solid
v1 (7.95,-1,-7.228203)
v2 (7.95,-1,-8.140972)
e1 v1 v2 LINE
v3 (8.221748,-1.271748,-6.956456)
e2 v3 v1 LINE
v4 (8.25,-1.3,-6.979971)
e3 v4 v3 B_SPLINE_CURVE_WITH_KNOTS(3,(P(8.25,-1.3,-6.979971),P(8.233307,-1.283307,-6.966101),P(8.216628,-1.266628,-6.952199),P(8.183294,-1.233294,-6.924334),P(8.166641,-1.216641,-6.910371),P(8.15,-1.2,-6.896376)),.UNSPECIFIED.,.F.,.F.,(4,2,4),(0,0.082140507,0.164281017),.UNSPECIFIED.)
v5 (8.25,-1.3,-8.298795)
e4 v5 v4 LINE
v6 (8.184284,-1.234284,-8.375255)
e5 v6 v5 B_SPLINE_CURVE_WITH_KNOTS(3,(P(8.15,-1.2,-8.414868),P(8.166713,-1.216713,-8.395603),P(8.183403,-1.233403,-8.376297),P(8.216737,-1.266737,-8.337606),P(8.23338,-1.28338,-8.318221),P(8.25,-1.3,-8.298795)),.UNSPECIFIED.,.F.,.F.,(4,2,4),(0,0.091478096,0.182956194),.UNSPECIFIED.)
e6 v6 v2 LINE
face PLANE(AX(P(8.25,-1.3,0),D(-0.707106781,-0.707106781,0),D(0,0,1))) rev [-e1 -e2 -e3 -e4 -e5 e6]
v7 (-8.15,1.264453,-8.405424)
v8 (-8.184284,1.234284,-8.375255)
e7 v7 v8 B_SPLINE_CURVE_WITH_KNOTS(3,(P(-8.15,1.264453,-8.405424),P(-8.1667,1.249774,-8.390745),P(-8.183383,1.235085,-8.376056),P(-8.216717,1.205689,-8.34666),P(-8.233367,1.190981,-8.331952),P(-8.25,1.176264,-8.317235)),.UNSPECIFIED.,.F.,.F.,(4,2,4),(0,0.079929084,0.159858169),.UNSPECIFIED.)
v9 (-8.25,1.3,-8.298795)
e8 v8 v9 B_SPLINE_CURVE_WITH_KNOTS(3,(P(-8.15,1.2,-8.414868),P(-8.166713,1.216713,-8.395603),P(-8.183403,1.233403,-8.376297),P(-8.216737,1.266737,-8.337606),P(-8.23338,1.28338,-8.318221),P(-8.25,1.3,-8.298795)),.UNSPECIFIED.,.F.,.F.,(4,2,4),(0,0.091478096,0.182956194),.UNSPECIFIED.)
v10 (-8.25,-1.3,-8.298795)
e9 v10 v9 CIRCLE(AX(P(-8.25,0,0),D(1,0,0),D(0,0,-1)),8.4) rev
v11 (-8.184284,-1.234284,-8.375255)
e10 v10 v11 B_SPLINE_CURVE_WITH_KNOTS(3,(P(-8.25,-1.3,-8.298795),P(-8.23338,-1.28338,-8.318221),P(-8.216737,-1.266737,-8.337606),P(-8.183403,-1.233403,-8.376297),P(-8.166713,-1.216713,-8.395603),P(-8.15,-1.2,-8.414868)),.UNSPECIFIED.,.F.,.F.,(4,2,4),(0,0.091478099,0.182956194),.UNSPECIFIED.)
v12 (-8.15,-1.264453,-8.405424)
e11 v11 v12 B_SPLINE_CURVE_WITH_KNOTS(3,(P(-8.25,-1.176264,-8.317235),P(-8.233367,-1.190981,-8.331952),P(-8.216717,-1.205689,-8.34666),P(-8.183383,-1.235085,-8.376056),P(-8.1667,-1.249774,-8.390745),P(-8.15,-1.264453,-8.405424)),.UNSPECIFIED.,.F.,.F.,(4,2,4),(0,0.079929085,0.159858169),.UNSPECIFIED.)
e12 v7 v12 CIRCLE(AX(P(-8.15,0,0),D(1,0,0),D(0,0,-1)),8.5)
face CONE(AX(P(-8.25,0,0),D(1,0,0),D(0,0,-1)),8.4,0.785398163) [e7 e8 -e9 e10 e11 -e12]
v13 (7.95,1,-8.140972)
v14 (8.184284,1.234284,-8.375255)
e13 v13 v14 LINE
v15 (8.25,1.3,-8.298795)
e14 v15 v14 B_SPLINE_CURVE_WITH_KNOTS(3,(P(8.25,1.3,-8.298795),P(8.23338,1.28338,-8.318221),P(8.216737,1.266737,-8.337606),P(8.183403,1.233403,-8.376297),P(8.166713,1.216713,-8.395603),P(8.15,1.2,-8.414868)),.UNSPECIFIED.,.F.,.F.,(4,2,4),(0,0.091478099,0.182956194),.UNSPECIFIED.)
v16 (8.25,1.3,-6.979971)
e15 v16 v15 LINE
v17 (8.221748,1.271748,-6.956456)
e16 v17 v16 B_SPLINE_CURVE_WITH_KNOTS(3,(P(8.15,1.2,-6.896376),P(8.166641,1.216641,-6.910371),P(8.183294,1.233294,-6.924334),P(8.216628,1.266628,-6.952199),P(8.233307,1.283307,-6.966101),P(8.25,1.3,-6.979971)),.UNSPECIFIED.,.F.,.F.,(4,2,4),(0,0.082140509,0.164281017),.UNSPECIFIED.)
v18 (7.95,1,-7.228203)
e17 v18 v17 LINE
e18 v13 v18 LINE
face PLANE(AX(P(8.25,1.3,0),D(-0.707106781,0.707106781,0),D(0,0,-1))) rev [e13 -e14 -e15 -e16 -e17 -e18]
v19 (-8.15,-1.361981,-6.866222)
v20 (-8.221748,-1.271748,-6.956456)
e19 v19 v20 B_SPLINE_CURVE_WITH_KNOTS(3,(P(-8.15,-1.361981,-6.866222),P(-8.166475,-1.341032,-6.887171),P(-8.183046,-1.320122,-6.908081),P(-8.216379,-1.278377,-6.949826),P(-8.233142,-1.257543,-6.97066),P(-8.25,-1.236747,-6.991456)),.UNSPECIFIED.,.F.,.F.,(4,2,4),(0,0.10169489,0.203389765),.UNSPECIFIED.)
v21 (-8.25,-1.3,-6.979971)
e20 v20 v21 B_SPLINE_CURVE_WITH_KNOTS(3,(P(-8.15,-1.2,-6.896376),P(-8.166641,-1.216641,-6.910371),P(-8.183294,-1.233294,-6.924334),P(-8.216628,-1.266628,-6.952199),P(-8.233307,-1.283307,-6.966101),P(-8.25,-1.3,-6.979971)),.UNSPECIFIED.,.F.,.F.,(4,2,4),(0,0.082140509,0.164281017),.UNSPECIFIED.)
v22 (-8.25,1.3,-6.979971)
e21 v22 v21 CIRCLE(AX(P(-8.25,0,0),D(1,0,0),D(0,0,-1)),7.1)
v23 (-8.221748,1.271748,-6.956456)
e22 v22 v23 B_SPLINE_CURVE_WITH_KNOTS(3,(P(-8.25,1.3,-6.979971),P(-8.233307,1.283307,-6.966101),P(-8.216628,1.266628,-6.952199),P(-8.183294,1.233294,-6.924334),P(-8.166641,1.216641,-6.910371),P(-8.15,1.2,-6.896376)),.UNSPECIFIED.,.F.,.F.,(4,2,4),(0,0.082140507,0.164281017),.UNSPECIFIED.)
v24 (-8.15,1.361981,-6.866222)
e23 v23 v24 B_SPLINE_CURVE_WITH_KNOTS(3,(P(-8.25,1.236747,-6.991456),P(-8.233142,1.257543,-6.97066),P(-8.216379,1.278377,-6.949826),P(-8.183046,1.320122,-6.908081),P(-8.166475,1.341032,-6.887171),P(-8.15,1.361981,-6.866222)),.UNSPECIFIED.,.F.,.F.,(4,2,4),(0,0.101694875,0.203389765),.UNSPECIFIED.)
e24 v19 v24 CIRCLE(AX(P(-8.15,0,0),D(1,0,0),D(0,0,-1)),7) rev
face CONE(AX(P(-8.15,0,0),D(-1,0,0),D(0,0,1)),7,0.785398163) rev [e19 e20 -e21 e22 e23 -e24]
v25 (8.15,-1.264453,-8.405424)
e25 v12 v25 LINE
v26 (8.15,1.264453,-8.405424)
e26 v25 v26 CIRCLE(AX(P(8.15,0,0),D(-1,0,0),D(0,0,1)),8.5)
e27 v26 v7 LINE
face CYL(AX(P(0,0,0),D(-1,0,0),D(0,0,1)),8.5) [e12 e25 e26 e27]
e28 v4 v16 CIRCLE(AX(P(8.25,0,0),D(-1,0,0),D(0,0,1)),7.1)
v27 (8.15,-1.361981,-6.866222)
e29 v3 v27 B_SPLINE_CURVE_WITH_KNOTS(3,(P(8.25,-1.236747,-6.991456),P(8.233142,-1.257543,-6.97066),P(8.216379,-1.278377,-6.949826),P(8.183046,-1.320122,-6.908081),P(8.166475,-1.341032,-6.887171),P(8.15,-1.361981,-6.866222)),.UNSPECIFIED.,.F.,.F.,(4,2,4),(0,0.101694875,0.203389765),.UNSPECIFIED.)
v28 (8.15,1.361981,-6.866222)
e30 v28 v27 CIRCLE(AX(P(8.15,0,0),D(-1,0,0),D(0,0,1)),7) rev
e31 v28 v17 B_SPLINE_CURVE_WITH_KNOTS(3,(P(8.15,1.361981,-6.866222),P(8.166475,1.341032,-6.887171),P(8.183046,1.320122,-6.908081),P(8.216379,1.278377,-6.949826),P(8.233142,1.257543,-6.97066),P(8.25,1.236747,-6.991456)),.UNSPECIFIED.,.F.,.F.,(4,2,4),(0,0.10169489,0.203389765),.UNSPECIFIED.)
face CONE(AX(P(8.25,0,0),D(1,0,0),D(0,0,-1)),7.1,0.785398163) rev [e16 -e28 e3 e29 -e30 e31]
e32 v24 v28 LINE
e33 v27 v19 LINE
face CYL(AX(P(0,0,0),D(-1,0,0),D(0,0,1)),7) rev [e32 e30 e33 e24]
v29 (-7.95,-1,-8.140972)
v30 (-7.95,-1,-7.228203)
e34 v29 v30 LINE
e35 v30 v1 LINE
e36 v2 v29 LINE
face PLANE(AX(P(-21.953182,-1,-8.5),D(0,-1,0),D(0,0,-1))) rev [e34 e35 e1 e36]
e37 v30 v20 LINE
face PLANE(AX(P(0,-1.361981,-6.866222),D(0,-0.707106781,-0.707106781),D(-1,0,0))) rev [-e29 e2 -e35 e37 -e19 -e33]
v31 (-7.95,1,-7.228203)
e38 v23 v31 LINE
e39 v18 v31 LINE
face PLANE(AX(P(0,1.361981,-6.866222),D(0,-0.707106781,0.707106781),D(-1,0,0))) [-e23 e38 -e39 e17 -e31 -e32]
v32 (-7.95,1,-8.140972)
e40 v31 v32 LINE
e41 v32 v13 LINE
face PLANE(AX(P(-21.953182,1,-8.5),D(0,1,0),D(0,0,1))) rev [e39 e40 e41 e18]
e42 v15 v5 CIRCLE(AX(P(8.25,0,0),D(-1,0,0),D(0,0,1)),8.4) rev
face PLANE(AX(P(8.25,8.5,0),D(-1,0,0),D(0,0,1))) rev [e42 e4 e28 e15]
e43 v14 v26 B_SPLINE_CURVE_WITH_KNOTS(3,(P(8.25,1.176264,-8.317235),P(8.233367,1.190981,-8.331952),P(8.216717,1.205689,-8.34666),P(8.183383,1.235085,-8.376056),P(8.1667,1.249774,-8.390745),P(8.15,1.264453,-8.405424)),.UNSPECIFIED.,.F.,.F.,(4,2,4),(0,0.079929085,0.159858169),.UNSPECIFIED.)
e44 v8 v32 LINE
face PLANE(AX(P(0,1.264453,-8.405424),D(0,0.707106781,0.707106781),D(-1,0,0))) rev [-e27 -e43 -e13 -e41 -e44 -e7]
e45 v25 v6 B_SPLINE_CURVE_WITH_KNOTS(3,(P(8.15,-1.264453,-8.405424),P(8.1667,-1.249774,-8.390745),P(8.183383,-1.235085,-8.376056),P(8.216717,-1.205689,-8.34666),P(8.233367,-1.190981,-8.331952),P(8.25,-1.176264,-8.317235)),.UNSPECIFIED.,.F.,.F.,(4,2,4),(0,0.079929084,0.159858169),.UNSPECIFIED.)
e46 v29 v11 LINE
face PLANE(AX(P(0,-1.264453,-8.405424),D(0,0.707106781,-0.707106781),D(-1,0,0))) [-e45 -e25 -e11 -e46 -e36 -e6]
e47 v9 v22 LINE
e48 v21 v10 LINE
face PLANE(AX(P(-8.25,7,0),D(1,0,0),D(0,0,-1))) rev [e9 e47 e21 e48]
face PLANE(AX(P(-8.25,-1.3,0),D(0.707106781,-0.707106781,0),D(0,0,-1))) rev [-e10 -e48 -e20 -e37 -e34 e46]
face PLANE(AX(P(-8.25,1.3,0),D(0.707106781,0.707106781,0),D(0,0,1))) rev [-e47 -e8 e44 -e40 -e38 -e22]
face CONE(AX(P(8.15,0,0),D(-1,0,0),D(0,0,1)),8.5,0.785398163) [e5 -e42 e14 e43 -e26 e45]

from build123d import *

# Parameters (mm, degrees)
SKETCH1_W          = 16.5
SKETCH1_H          = 1.5
CHAMFER1_SIZE      = 0.1
SKETCH2_W          = 43.906364016
SKETCH2_H          = 2
CUT_EXTRUDE1_DEPTH = 15.579523312
CHAMFER2_SIZE      = 0.3


with BuildPart() as part:
    # Sketch1 → Revolve1 (revolve)
    with BuildSketch(Plane.XY, mode=Mode.PRIVATE) as revolve1_sk:
        with Locations((0, 7.75)):
            Rectangle(SKETCH1_W, SKETCH1_H)
    revolve(revolve1_sk.sketch.rotate(Axis((0, 0, 0), (1, 0, 0)), 90), axis=Axis((0, 0, 0), (1, 0, 0)))

    # Chamfer1
    chamfer1_edges = [part.edges().sort_by_distance(p)[0] for p in [
        (-8.25, 0, -7),
        (8.25, 0, -7),
        (8.25, 0, -8.5),
        (-8.25, 0, -8.5),
    ]]
    chamfer(chamfer1_edges, length=CHAMFER1_SIZE)

    # Sketch2 → Cut-Extrude1 (cut, through all)
    with BuildSketch(Plane.XY):
        Rectangle(SKETCH2_W, SKETCH2_H)
    extrude(amount=-CUT_EXTRUDE1_DEPTH, mode=Mode.SUBTRACT)

    # Chamfer2
    # the kernel refuses this chamfer: 0.354238868, 0.3, 0.270099322 mm, written as the material it takes off along each edge
    with BuildSketch(Plane(origin=(8.25, 1, -6.257719812), x_dir=(-1, 0, 0), z_dir=(0, 0, -1)), Plane(origin=(-8.25, 1, -9.111768681), x_dir=(1, 0, 0), z_dir=(0, 0, 1)), Plane(origin=(-8.25, -1, -6.257719812), x_dir=(1, 0, 0), z_dir=(0, 0, -1))) as chamfer2_piece_1:
        Polygon((CHAMFER2_SIZE, 0), (0, CHAMFER2_SIZE), (0, 0), align=None)
    extrude(amount=2.854048869, mode=Mode.SUBTRACT)
    with BuildSketch(Plane(origin=(8.25, -1, -9.111768681), x_dir=(0, -1, 0), z_dir=(0, 0, 1))) as chamfer2_piece_2:
        Polygon((CHAMFER2_SIZE, 0), (0, -CHAMFER2_SIZE), (0, 0), align=None)
    extrude(amount=2.854048869, mode=Mode.SUBTRACT)
    with BuildSketch(Plane(origin=(8.921504896, -1, -8.440971508), x_dir=(0, 0, 1), z_dir=(-1, 0, 0))) as chamfer2_piece_3:
        with BuildLine():
            Line((CHAMFER2_SIZE, 0), (0.035547132, -0.264452868))
            ThreePointArc((0.035547132, -0.264452868), (0.01722122, -0.135971426), (0, 0))
            Line((0, 0), (CHAMFER2_SIZE, 0))
        make_face()
    extrude(amount=17.843009793, mode=Mode.SUBTRACT)
    with BuildSketch(Plane(origin=(8.921504896, 1, -8.440971508), x_dir=(0, 0, 1), z_dir=(-1, 0, 0))) as chamfer2_piece_4:
        with BuildLine():
            Line((CHAMFER2_SIZE, 0), (0.035547132, 0.264452868))
            ThreePointArc((0.035547132, 0.264452868), (0.01722122, 0.135971426), (0, 0))
            Line((0, 0), (CHAMFER2_SIZE, 0))
        make_face()
    extrude(amount=17.843009793, mode=Mode.SUBTRACT)
    with BuildSketch(Plane(origin=(-9.097260331, -1, -6.92820323), x_dir=(0, 0, -1), z_dir=(1, 0, 0))) as chamfer2_piece_5:
        with BuildLine():
            Line((CHAMFER2_SIZE, 0), (-0.061980996, -0.361980996))
            ThreePointArc((-0.061980996, -0.361980996), (-0.029595535, -0.187102296), (0, 0))
            Line((0, 0), (CHAMFER2_SIZE, 0))
        make_face()
    extrude(amount=18.194520662, mode=Mode.SUBTRACT)
    with BuildSketch(Plane(origin=(-9.097260331, 1, -6.92820323), x_dir=(0, 0.9856552884232092, 0.16877100581367702), z_dir=(1, 0, 0))) as chamfer2_piece_6:
        with BuildLine():
            Line((0.367249078, 0), (-CHAMFER2_SIZE * 0.168771005814, -CHAMFER2_SIZE * 0.985655288423))
            Line((-CHAMFER2_SIZE * 0.168771005814, -CHAMFER2_SIZE * 0.985655288423), (0, 0))
            ThreePointArc((0, 0), (0.189413236, -0.002406447), (0.367249078, 0))
        make_face()
    extrude(amount=18.194520662, mode=Mode.SUBTRACT)


solid = part.part
